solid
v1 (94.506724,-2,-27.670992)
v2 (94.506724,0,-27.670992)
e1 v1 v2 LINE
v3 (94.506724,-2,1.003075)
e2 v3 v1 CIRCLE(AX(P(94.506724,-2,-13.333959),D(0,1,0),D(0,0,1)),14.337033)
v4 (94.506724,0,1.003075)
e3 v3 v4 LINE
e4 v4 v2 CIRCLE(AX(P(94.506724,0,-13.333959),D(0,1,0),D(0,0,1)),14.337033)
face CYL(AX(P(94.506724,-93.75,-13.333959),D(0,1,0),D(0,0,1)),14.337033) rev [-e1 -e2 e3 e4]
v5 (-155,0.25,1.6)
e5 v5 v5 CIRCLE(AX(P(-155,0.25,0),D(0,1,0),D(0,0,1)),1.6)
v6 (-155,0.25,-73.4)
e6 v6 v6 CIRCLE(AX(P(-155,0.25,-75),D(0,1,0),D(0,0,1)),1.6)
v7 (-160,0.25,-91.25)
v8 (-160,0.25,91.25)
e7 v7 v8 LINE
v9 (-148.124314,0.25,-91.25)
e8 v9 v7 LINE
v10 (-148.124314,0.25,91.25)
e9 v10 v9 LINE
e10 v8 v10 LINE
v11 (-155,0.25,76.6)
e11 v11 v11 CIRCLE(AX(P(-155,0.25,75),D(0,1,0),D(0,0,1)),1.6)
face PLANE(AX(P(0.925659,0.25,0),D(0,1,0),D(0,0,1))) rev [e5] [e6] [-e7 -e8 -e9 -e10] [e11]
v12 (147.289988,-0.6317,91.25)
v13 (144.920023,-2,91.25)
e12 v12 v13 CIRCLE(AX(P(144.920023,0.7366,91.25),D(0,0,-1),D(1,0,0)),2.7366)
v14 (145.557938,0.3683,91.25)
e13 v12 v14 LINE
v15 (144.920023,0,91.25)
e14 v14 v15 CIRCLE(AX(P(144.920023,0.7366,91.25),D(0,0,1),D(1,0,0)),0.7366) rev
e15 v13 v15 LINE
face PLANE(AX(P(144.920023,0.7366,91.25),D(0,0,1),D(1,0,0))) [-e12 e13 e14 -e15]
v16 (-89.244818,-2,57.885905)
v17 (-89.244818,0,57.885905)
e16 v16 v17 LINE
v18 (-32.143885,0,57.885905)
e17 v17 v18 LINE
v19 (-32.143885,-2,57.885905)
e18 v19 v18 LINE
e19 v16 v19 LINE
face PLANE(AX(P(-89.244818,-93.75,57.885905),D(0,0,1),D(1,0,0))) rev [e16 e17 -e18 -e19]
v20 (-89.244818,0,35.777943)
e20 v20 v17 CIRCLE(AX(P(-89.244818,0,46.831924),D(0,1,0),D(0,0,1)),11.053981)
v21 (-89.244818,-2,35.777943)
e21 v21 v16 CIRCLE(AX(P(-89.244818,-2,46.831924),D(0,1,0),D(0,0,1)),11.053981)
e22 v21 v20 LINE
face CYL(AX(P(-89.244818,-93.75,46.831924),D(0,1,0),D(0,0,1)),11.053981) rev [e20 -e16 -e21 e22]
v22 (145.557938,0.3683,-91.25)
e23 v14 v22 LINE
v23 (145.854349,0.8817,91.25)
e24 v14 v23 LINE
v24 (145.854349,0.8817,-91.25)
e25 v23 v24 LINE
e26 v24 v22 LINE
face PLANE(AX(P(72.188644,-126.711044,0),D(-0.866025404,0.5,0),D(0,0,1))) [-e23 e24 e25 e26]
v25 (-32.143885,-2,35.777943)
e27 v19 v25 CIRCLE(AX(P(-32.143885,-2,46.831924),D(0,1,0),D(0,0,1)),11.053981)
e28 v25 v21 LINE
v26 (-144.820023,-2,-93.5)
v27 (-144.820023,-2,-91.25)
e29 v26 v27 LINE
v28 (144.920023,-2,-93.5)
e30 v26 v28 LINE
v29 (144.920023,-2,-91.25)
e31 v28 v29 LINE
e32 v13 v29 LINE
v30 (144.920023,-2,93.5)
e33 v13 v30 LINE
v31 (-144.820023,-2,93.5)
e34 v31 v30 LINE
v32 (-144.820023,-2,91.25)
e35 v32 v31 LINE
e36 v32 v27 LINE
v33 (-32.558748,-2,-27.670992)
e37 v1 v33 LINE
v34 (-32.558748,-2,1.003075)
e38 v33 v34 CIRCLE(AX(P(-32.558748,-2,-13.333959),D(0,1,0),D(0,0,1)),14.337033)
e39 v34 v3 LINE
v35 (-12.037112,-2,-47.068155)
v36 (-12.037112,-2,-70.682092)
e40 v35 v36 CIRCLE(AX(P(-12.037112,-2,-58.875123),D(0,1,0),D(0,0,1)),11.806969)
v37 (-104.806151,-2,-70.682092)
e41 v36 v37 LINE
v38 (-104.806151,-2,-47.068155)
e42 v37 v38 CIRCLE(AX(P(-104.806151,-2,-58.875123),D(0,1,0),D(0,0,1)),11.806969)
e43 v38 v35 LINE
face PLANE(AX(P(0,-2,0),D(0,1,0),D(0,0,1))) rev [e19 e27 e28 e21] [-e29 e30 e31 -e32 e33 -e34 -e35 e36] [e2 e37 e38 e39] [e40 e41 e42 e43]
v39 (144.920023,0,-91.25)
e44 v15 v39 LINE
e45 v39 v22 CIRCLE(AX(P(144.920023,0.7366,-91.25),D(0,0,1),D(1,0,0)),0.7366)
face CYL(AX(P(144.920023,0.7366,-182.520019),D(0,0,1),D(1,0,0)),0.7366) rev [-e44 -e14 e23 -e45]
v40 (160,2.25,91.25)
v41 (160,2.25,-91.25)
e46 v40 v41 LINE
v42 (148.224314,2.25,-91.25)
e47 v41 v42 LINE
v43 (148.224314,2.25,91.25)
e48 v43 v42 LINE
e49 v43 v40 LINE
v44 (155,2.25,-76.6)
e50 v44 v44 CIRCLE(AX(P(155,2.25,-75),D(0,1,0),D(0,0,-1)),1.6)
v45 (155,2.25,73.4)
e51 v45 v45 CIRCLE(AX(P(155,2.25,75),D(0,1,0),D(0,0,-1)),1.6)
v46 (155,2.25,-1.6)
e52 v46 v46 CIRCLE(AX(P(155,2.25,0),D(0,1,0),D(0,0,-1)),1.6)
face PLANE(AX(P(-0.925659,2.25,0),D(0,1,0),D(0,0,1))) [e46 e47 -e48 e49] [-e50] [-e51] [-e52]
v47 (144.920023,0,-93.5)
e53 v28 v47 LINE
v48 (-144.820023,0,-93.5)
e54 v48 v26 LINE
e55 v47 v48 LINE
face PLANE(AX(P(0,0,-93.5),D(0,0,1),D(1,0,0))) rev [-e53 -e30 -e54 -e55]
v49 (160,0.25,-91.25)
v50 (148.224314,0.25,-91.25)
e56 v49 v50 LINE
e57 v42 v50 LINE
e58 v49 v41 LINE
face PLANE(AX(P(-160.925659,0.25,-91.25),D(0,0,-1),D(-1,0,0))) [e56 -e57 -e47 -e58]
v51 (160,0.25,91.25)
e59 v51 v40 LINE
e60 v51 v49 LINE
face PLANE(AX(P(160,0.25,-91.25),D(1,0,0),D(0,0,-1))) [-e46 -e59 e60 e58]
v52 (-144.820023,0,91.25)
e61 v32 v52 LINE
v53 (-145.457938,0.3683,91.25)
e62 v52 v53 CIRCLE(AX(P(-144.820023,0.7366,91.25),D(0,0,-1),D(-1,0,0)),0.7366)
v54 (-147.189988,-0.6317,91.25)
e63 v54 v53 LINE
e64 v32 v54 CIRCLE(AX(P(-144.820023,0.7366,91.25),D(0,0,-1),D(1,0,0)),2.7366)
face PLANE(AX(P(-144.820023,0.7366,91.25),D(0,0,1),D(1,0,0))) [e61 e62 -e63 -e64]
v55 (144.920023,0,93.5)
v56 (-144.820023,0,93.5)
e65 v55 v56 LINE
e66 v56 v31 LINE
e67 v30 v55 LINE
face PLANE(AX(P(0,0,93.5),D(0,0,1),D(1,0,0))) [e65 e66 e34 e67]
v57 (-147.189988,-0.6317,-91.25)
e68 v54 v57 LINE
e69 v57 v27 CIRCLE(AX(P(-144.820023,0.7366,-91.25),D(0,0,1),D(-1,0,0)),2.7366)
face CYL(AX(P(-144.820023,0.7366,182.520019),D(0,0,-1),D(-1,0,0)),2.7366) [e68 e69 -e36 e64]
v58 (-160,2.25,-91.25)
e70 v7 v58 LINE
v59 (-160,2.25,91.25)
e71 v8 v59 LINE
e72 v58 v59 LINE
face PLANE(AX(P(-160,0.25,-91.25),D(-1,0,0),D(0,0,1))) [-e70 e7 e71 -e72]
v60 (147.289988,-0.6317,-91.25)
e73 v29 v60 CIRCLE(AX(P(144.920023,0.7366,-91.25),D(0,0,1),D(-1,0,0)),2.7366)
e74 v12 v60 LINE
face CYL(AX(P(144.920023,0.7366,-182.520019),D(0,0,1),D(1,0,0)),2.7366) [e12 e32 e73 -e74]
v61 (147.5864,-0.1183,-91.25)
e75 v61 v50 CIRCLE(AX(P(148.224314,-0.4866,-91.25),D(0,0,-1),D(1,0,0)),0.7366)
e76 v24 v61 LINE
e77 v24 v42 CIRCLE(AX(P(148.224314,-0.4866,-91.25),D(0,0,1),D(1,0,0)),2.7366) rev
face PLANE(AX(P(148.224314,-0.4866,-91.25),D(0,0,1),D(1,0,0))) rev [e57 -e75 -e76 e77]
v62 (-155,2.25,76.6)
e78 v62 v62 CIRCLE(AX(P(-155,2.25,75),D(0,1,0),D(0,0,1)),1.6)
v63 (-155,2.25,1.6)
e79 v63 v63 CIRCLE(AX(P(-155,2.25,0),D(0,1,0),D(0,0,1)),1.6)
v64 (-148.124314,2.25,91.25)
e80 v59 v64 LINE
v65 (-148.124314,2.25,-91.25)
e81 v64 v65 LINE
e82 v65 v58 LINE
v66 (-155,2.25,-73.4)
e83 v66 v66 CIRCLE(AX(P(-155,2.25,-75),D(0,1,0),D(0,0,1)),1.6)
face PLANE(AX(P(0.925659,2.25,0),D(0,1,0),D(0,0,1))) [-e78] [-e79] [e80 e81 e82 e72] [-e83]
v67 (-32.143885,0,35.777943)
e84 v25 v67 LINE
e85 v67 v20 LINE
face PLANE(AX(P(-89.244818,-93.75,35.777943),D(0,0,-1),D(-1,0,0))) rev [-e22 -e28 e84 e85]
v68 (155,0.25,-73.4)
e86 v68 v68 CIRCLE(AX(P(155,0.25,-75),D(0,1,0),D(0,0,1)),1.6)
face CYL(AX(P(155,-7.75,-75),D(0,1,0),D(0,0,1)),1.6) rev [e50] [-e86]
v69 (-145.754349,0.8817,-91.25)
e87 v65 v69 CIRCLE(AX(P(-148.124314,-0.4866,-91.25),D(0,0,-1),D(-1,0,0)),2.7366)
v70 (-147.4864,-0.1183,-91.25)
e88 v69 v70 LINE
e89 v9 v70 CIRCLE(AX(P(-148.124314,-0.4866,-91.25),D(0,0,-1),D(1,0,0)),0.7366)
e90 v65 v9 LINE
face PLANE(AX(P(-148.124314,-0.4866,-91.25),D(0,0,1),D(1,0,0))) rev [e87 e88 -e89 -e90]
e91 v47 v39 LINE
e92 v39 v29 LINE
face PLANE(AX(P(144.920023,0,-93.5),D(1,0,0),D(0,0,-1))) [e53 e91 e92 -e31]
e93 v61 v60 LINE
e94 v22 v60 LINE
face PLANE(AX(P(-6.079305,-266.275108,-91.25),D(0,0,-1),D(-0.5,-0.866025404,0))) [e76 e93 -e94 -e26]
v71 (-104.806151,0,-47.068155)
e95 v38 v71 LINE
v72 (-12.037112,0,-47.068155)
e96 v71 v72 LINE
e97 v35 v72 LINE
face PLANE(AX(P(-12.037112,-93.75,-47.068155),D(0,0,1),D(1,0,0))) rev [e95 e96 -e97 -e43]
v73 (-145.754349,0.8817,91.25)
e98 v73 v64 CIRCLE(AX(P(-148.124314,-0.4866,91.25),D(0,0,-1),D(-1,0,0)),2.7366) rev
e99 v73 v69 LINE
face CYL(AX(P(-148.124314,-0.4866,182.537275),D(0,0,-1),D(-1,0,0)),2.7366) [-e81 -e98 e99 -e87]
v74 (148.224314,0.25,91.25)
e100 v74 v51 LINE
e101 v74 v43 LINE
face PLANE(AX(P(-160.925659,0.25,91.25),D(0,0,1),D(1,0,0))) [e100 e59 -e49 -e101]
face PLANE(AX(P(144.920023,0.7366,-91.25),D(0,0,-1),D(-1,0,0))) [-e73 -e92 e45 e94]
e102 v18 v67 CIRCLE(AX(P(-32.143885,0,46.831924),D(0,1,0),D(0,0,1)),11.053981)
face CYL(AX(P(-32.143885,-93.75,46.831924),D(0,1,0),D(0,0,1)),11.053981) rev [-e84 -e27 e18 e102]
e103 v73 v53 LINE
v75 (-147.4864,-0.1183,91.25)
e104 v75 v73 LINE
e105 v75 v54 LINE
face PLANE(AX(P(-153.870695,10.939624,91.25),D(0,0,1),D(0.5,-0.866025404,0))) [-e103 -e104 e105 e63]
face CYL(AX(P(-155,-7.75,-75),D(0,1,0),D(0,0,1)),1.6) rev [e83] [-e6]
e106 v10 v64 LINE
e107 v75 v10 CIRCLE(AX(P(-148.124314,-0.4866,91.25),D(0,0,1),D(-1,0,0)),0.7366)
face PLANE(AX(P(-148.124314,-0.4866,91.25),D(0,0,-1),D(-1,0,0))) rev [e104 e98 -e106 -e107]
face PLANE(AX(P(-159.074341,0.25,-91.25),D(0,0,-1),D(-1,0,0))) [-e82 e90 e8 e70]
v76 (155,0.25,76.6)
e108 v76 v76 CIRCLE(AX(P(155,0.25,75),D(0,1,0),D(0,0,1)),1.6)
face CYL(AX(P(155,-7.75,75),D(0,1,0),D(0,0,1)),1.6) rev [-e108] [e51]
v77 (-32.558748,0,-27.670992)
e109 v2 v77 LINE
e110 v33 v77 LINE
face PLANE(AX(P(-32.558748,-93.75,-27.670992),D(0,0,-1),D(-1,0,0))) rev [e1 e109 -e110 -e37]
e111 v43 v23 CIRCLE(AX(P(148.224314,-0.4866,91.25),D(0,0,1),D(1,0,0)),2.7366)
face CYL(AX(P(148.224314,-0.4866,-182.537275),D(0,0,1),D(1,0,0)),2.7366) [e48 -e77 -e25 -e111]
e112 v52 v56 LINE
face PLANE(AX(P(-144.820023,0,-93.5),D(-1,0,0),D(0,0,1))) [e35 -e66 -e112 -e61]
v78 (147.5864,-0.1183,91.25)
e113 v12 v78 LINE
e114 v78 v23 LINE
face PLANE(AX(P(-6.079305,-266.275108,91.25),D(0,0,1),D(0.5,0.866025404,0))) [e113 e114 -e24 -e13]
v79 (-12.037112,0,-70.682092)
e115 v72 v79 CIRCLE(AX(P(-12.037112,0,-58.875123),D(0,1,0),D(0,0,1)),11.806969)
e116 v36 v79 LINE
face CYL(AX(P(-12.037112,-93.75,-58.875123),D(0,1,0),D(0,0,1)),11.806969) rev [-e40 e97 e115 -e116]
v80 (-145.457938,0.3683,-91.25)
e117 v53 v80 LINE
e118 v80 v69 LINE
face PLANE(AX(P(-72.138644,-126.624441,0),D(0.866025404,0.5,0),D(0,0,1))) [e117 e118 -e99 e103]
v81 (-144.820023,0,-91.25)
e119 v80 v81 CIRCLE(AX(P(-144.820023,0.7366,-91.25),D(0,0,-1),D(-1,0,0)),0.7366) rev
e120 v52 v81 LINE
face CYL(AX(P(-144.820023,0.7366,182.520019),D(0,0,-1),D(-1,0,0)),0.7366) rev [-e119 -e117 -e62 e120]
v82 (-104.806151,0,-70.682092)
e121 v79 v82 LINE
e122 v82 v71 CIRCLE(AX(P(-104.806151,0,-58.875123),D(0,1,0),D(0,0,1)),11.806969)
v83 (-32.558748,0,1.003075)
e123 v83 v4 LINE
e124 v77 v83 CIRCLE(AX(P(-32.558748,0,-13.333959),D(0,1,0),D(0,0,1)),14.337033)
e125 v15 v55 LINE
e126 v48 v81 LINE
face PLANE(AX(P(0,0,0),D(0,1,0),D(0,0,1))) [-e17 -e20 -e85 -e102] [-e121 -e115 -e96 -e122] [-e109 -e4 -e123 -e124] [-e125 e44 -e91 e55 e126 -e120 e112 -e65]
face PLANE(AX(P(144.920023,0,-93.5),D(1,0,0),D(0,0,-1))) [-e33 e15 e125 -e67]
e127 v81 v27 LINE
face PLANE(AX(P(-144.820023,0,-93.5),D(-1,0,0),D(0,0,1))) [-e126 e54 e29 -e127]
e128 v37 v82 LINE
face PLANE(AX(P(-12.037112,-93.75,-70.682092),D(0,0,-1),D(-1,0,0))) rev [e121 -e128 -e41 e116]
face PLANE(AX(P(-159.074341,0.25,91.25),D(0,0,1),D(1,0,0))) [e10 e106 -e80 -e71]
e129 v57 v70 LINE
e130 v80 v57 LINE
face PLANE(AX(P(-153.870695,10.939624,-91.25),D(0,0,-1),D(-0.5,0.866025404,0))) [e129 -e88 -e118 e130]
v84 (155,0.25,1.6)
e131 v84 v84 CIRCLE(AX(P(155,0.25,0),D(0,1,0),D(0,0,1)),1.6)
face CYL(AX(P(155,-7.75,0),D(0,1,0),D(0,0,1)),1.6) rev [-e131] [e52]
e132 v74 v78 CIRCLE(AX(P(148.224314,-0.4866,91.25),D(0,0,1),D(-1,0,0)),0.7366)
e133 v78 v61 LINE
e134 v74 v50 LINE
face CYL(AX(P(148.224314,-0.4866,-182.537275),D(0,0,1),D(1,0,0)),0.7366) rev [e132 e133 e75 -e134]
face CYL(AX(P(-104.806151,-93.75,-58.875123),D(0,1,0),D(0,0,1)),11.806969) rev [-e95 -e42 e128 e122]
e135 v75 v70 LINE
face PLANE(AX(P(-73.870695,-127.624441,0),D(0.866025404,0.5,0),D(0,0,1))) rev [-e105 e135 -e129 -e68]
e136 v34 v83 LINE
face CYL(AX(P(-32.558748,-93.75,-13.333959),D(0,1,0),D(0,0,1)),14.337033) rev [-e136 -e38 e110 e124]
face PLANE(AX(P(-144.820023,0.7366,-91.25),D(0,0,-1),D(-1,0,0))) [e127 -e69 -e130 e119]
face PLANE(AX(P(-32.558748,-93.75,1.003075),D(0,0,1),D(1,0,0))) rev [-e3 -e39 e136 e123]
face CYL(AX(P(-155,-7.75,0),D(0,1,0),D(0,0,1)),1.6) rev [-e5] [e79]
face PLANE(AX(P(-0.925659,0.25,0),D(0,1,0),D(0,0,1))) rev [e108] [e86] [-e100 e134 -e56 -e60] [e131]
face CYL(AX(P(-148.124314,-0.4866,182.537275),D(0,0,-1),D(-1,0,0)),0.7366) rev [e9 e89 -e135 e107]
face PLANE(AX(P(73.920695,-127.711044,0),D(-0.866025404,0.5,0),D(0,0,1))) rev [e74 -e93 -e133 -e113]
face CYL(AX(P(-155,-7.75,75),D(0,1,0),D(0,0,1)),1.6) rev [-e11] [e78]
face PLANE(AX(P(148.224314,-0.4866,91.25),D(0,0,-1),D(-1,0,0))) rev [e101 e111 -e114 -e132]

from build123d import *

# Parameters (mm, degrees)
SKETCH_1_W             = 320
SKETCH_1_H             = 182.5
SM_BASE_FLANGE_1_DEPTH = 2
OTHER_START            = -91.25
OTHER_1_DEPTH          = 182.5
OTHER_1_2_DEPTH        = 182.5
OTHER_4_DEPTH          = 182.5
OTHER_4_2_DEPTH        = 182.5
SKETCH_8_R             = 1.6
CUT_EXTRUDE_1_DEPTH    = 10
EXTRUDE_1_DEPTH        = 93.5
EXTRUDE_1_DEPTH_BACK   = 93.5
SKETCH_9_W             = 289.740046506
SKETCH_9_H             = 2
CUT_EXTRUDE_2_DEPTH    = 93.75


# Read off the part's stored shape, not the designer's step: Изгиб1, Изгиб4
# Sheet-metal steps are written as plain solids
with BuildPart() as part:
    # Sketch 1 → Базовая кромка1 (new body)
    with BuildSketch(Plane(origin=(0, 0, 0), x_dir=(1, 0, 0), z_dir=(0, 1, 0))):
        Rectangle(SKETCH_1_W, SKETCH_1_H)
    extrude(amount=-SM_BASE_FLANGE_1_DEPTH)

    # Other 1 outline → Other 1 (cut)
    with BuildSketch(Plane.XY.offset(OTHER_START)):
        with BuildLine():
            ThreePointArc((-144.820023253, -2), (-146.188323253, -1.63336512), (-147.189988373, -0.6317))
            Line((-147.189988373, -0.6317), (-147.486400002, -0.1183))
            ThreePointArc((-147.486400002, -0.1183), (-147.525930573, -0.05704621), (-147.571322452, 0))
            Line((-147.571322452, 0), (-160, 0))
            Line((-160, 0), (-160, -2))
            Line((-160, -2), (-144.820023253, -2))
        make_face()
    extrude(amount=OTHER_1_DEPTH, mode=Mode.SUBTRACT)

    # Other 1 2 outline → Other 1 2 (add)
    with BuildSketch(Plane.XY.offset(OTHER_START)):
        with BuildLine():
            ThreePointArc((-148.124314314, 0.25), (-147.820875688, 0.184596365), (-147.571322452, 0))
            Line((-147.571322452, 0), (-144.820023253, 0))
            ThreePointArc((-144.820023253, 0), (-145.188323253, 0.098685688), (-145.457937566, 0.3683))
            Line((-145.457937566, 0.3683), (-145.754349194, 0.8817))
            ThreePointArc((-145.754349194, 0.8817), (-146.756014314, 1.88336512), (-148.124314314, 2.25))
            Line((-148.124314314, 2.25), (-160, 2.25))
            Line((-160, 2.25), (-160, 0.25))
            Line((-160, 0.25), (-148.124314314, 0.25))
        make_face()
    extrude(amount=OTHER_1_2_DEPTH)

    # Other 4 outline → Other 4 (cut)
    with BuildSketch(Plane.XY.offset(OTHER_START)):
        with BuildLine():
            Line((160, 0), (147.671322452, 0))
            ThreePointArc((147.671322452, 0), (147.625930573, -0.05704621), (147.586400002, -0.1183))
            Line((147.586400002, -0.1183), (147.289988373, -0.6317))
            ThreePointArc((147.289988373, -0.6317), (146.288323253, -1.63336512), (144.920023253, -2))
            Line((144.920023253, -2), (160, -2))
            Line((160, -2), (160, 0))
        make_face()
    extrude(amount=OTHER_4_DEPTH, mode=Mode.SUBTRACT)

    # Other 4 2 outline → Other 4 2 (add)
    with BuildSketch(Plane.XY.offset(OTHER_START)):
        with BuildLine():
            Line((148.224314314, 0.25), (160, 0.25))
            Line((160, 0.25), (160, 2.25))
            Line((160, 2.25), (148.224314314, 2.25))
            ThreePointArc((148.224314314, 2.25), (146.856014314, 1.88336512), (145.854349194, 0.8817))
            Line((145.854349194, 0.8817), (145.557937566, 0.3683))
            ThreePointArc((145.557937566, 0.3683), (145.288323253, 0.098685688), (144.920023253, 0))
            Line((144.920023253, 0), (147.671322452, 0))
            ThreePointArc((147.671322452, 0), (147.920875688, 0.184596365), (148.224314314, 0.25))
        make_face()
    extrude(amount=OTHER_4_2_DEPTH)

    # Эскиз8 → Вырез-Вытянуть1 (cut)
    with BuildSketch(Plane(origin=(0, 2.25, 0), x_dir=(1, 0, 0), z_dir=(0, 1, 0))):
        with Locations(Location((-155, 0, 0), (0, 0, 270))):
            Circle(SKETCH_8_R)
        with Locations(Location((-155, 75, 0), (0, 0, 270))):
            Circle(SKETCH_8_R)
        with Locations(Location((-155, -75, 0), (0, 0, 270))):
            Circle(SKETCH_8_R)
        with Locations(Location((155, -75, 0), (0, 0, 270))):
            Circle(SKETCH_8_R)
        with Locations(Location((155, 75, 0), (0, 0, 270))):
            Circle(SKETCH_8_R)
        with Locations(Location((155, 0, 0), (0, 0, 270))):
            Circle(SKETCH_8_R)
    extrude(amount=-CUT_EXTRUDE_1_DEPTH, mode=Mode.SUBTRACT)

    # Эскиз9 → Бобышка-Вытянуть1 (add, two sides: drawn at the far end of the back side and taken through both)
    with BuildSketch(Plane.XY.offset(-EXTRUDE_1_DEPTH_BACK)):
        with Locations((0.05, -1)):
            Rectangle(SKETCH_9_W, SKETCH_9_H)
    extrude(amount=EXTRUDE_1_DEPTH + EXTRUDE_1_DEPTH_BACK)

    # Эскиз10 → Вырез-Вытянуть2 (cut)
    with BuildSketch(Plane(origin=(0, 0, 0), x_dir=(1, 0, 0), z_dir=(0, 1, 0))):
        with BuildLine():
            Line((-12.037112187, 47.06815468), (-104.806151311, 47.06815468))
            ThreePointArc((-104.806151311, 47.06815468), (-116.613119927, 58.875123295), (-104.806151311, 70.682091911))
            Line((-104.806151311, 70.682091911), (-12.037112187, 70.682091911))
            ThreePointArc((-12.037112187, 70.682091911), (-0.230143571, 58.875123295), (-12.037112187, 47.06815468))
        make_face()
        with BuildLine():
            Line((-32.558748115, 27.670991954), (94.506723655, 27.670991954))
            ThreePointArc((94.506723655, 27.670991954), (108.843756974, 13.333958635), (94.506723655, -1.003074685))
            Line((94.506723655, -1.003074685), (-32.558748115, -1.003074685))
            ThreePointArc((-32.558748115, -1.003074685), (-46.895781434, 13.333958635), (-32.558748115, 27.670991954))
        make_face()
        with BuildLine():
            Line((-89.244817746, -35.777942633), (-32.143884778, -35.777942633))
            ThreePointArc((-32.143884778, -35.777942633), (-21.089903693, -46.831923718), (-32.143884778, -57.885904803))
            Line((-32.143884778, -57.885904803), (-89.244817746, -57.885904803))
            ThreePointArc((-89.244817746, -57.885904803), (-100.298798831, -46.831923718), (-89.244817746, -35.777942633))
        make_face()
    extrude(amount=-CUT_EXTRUDE_2_DEPTH, mode=Mode.SUBTRACT)


solid = part.part
